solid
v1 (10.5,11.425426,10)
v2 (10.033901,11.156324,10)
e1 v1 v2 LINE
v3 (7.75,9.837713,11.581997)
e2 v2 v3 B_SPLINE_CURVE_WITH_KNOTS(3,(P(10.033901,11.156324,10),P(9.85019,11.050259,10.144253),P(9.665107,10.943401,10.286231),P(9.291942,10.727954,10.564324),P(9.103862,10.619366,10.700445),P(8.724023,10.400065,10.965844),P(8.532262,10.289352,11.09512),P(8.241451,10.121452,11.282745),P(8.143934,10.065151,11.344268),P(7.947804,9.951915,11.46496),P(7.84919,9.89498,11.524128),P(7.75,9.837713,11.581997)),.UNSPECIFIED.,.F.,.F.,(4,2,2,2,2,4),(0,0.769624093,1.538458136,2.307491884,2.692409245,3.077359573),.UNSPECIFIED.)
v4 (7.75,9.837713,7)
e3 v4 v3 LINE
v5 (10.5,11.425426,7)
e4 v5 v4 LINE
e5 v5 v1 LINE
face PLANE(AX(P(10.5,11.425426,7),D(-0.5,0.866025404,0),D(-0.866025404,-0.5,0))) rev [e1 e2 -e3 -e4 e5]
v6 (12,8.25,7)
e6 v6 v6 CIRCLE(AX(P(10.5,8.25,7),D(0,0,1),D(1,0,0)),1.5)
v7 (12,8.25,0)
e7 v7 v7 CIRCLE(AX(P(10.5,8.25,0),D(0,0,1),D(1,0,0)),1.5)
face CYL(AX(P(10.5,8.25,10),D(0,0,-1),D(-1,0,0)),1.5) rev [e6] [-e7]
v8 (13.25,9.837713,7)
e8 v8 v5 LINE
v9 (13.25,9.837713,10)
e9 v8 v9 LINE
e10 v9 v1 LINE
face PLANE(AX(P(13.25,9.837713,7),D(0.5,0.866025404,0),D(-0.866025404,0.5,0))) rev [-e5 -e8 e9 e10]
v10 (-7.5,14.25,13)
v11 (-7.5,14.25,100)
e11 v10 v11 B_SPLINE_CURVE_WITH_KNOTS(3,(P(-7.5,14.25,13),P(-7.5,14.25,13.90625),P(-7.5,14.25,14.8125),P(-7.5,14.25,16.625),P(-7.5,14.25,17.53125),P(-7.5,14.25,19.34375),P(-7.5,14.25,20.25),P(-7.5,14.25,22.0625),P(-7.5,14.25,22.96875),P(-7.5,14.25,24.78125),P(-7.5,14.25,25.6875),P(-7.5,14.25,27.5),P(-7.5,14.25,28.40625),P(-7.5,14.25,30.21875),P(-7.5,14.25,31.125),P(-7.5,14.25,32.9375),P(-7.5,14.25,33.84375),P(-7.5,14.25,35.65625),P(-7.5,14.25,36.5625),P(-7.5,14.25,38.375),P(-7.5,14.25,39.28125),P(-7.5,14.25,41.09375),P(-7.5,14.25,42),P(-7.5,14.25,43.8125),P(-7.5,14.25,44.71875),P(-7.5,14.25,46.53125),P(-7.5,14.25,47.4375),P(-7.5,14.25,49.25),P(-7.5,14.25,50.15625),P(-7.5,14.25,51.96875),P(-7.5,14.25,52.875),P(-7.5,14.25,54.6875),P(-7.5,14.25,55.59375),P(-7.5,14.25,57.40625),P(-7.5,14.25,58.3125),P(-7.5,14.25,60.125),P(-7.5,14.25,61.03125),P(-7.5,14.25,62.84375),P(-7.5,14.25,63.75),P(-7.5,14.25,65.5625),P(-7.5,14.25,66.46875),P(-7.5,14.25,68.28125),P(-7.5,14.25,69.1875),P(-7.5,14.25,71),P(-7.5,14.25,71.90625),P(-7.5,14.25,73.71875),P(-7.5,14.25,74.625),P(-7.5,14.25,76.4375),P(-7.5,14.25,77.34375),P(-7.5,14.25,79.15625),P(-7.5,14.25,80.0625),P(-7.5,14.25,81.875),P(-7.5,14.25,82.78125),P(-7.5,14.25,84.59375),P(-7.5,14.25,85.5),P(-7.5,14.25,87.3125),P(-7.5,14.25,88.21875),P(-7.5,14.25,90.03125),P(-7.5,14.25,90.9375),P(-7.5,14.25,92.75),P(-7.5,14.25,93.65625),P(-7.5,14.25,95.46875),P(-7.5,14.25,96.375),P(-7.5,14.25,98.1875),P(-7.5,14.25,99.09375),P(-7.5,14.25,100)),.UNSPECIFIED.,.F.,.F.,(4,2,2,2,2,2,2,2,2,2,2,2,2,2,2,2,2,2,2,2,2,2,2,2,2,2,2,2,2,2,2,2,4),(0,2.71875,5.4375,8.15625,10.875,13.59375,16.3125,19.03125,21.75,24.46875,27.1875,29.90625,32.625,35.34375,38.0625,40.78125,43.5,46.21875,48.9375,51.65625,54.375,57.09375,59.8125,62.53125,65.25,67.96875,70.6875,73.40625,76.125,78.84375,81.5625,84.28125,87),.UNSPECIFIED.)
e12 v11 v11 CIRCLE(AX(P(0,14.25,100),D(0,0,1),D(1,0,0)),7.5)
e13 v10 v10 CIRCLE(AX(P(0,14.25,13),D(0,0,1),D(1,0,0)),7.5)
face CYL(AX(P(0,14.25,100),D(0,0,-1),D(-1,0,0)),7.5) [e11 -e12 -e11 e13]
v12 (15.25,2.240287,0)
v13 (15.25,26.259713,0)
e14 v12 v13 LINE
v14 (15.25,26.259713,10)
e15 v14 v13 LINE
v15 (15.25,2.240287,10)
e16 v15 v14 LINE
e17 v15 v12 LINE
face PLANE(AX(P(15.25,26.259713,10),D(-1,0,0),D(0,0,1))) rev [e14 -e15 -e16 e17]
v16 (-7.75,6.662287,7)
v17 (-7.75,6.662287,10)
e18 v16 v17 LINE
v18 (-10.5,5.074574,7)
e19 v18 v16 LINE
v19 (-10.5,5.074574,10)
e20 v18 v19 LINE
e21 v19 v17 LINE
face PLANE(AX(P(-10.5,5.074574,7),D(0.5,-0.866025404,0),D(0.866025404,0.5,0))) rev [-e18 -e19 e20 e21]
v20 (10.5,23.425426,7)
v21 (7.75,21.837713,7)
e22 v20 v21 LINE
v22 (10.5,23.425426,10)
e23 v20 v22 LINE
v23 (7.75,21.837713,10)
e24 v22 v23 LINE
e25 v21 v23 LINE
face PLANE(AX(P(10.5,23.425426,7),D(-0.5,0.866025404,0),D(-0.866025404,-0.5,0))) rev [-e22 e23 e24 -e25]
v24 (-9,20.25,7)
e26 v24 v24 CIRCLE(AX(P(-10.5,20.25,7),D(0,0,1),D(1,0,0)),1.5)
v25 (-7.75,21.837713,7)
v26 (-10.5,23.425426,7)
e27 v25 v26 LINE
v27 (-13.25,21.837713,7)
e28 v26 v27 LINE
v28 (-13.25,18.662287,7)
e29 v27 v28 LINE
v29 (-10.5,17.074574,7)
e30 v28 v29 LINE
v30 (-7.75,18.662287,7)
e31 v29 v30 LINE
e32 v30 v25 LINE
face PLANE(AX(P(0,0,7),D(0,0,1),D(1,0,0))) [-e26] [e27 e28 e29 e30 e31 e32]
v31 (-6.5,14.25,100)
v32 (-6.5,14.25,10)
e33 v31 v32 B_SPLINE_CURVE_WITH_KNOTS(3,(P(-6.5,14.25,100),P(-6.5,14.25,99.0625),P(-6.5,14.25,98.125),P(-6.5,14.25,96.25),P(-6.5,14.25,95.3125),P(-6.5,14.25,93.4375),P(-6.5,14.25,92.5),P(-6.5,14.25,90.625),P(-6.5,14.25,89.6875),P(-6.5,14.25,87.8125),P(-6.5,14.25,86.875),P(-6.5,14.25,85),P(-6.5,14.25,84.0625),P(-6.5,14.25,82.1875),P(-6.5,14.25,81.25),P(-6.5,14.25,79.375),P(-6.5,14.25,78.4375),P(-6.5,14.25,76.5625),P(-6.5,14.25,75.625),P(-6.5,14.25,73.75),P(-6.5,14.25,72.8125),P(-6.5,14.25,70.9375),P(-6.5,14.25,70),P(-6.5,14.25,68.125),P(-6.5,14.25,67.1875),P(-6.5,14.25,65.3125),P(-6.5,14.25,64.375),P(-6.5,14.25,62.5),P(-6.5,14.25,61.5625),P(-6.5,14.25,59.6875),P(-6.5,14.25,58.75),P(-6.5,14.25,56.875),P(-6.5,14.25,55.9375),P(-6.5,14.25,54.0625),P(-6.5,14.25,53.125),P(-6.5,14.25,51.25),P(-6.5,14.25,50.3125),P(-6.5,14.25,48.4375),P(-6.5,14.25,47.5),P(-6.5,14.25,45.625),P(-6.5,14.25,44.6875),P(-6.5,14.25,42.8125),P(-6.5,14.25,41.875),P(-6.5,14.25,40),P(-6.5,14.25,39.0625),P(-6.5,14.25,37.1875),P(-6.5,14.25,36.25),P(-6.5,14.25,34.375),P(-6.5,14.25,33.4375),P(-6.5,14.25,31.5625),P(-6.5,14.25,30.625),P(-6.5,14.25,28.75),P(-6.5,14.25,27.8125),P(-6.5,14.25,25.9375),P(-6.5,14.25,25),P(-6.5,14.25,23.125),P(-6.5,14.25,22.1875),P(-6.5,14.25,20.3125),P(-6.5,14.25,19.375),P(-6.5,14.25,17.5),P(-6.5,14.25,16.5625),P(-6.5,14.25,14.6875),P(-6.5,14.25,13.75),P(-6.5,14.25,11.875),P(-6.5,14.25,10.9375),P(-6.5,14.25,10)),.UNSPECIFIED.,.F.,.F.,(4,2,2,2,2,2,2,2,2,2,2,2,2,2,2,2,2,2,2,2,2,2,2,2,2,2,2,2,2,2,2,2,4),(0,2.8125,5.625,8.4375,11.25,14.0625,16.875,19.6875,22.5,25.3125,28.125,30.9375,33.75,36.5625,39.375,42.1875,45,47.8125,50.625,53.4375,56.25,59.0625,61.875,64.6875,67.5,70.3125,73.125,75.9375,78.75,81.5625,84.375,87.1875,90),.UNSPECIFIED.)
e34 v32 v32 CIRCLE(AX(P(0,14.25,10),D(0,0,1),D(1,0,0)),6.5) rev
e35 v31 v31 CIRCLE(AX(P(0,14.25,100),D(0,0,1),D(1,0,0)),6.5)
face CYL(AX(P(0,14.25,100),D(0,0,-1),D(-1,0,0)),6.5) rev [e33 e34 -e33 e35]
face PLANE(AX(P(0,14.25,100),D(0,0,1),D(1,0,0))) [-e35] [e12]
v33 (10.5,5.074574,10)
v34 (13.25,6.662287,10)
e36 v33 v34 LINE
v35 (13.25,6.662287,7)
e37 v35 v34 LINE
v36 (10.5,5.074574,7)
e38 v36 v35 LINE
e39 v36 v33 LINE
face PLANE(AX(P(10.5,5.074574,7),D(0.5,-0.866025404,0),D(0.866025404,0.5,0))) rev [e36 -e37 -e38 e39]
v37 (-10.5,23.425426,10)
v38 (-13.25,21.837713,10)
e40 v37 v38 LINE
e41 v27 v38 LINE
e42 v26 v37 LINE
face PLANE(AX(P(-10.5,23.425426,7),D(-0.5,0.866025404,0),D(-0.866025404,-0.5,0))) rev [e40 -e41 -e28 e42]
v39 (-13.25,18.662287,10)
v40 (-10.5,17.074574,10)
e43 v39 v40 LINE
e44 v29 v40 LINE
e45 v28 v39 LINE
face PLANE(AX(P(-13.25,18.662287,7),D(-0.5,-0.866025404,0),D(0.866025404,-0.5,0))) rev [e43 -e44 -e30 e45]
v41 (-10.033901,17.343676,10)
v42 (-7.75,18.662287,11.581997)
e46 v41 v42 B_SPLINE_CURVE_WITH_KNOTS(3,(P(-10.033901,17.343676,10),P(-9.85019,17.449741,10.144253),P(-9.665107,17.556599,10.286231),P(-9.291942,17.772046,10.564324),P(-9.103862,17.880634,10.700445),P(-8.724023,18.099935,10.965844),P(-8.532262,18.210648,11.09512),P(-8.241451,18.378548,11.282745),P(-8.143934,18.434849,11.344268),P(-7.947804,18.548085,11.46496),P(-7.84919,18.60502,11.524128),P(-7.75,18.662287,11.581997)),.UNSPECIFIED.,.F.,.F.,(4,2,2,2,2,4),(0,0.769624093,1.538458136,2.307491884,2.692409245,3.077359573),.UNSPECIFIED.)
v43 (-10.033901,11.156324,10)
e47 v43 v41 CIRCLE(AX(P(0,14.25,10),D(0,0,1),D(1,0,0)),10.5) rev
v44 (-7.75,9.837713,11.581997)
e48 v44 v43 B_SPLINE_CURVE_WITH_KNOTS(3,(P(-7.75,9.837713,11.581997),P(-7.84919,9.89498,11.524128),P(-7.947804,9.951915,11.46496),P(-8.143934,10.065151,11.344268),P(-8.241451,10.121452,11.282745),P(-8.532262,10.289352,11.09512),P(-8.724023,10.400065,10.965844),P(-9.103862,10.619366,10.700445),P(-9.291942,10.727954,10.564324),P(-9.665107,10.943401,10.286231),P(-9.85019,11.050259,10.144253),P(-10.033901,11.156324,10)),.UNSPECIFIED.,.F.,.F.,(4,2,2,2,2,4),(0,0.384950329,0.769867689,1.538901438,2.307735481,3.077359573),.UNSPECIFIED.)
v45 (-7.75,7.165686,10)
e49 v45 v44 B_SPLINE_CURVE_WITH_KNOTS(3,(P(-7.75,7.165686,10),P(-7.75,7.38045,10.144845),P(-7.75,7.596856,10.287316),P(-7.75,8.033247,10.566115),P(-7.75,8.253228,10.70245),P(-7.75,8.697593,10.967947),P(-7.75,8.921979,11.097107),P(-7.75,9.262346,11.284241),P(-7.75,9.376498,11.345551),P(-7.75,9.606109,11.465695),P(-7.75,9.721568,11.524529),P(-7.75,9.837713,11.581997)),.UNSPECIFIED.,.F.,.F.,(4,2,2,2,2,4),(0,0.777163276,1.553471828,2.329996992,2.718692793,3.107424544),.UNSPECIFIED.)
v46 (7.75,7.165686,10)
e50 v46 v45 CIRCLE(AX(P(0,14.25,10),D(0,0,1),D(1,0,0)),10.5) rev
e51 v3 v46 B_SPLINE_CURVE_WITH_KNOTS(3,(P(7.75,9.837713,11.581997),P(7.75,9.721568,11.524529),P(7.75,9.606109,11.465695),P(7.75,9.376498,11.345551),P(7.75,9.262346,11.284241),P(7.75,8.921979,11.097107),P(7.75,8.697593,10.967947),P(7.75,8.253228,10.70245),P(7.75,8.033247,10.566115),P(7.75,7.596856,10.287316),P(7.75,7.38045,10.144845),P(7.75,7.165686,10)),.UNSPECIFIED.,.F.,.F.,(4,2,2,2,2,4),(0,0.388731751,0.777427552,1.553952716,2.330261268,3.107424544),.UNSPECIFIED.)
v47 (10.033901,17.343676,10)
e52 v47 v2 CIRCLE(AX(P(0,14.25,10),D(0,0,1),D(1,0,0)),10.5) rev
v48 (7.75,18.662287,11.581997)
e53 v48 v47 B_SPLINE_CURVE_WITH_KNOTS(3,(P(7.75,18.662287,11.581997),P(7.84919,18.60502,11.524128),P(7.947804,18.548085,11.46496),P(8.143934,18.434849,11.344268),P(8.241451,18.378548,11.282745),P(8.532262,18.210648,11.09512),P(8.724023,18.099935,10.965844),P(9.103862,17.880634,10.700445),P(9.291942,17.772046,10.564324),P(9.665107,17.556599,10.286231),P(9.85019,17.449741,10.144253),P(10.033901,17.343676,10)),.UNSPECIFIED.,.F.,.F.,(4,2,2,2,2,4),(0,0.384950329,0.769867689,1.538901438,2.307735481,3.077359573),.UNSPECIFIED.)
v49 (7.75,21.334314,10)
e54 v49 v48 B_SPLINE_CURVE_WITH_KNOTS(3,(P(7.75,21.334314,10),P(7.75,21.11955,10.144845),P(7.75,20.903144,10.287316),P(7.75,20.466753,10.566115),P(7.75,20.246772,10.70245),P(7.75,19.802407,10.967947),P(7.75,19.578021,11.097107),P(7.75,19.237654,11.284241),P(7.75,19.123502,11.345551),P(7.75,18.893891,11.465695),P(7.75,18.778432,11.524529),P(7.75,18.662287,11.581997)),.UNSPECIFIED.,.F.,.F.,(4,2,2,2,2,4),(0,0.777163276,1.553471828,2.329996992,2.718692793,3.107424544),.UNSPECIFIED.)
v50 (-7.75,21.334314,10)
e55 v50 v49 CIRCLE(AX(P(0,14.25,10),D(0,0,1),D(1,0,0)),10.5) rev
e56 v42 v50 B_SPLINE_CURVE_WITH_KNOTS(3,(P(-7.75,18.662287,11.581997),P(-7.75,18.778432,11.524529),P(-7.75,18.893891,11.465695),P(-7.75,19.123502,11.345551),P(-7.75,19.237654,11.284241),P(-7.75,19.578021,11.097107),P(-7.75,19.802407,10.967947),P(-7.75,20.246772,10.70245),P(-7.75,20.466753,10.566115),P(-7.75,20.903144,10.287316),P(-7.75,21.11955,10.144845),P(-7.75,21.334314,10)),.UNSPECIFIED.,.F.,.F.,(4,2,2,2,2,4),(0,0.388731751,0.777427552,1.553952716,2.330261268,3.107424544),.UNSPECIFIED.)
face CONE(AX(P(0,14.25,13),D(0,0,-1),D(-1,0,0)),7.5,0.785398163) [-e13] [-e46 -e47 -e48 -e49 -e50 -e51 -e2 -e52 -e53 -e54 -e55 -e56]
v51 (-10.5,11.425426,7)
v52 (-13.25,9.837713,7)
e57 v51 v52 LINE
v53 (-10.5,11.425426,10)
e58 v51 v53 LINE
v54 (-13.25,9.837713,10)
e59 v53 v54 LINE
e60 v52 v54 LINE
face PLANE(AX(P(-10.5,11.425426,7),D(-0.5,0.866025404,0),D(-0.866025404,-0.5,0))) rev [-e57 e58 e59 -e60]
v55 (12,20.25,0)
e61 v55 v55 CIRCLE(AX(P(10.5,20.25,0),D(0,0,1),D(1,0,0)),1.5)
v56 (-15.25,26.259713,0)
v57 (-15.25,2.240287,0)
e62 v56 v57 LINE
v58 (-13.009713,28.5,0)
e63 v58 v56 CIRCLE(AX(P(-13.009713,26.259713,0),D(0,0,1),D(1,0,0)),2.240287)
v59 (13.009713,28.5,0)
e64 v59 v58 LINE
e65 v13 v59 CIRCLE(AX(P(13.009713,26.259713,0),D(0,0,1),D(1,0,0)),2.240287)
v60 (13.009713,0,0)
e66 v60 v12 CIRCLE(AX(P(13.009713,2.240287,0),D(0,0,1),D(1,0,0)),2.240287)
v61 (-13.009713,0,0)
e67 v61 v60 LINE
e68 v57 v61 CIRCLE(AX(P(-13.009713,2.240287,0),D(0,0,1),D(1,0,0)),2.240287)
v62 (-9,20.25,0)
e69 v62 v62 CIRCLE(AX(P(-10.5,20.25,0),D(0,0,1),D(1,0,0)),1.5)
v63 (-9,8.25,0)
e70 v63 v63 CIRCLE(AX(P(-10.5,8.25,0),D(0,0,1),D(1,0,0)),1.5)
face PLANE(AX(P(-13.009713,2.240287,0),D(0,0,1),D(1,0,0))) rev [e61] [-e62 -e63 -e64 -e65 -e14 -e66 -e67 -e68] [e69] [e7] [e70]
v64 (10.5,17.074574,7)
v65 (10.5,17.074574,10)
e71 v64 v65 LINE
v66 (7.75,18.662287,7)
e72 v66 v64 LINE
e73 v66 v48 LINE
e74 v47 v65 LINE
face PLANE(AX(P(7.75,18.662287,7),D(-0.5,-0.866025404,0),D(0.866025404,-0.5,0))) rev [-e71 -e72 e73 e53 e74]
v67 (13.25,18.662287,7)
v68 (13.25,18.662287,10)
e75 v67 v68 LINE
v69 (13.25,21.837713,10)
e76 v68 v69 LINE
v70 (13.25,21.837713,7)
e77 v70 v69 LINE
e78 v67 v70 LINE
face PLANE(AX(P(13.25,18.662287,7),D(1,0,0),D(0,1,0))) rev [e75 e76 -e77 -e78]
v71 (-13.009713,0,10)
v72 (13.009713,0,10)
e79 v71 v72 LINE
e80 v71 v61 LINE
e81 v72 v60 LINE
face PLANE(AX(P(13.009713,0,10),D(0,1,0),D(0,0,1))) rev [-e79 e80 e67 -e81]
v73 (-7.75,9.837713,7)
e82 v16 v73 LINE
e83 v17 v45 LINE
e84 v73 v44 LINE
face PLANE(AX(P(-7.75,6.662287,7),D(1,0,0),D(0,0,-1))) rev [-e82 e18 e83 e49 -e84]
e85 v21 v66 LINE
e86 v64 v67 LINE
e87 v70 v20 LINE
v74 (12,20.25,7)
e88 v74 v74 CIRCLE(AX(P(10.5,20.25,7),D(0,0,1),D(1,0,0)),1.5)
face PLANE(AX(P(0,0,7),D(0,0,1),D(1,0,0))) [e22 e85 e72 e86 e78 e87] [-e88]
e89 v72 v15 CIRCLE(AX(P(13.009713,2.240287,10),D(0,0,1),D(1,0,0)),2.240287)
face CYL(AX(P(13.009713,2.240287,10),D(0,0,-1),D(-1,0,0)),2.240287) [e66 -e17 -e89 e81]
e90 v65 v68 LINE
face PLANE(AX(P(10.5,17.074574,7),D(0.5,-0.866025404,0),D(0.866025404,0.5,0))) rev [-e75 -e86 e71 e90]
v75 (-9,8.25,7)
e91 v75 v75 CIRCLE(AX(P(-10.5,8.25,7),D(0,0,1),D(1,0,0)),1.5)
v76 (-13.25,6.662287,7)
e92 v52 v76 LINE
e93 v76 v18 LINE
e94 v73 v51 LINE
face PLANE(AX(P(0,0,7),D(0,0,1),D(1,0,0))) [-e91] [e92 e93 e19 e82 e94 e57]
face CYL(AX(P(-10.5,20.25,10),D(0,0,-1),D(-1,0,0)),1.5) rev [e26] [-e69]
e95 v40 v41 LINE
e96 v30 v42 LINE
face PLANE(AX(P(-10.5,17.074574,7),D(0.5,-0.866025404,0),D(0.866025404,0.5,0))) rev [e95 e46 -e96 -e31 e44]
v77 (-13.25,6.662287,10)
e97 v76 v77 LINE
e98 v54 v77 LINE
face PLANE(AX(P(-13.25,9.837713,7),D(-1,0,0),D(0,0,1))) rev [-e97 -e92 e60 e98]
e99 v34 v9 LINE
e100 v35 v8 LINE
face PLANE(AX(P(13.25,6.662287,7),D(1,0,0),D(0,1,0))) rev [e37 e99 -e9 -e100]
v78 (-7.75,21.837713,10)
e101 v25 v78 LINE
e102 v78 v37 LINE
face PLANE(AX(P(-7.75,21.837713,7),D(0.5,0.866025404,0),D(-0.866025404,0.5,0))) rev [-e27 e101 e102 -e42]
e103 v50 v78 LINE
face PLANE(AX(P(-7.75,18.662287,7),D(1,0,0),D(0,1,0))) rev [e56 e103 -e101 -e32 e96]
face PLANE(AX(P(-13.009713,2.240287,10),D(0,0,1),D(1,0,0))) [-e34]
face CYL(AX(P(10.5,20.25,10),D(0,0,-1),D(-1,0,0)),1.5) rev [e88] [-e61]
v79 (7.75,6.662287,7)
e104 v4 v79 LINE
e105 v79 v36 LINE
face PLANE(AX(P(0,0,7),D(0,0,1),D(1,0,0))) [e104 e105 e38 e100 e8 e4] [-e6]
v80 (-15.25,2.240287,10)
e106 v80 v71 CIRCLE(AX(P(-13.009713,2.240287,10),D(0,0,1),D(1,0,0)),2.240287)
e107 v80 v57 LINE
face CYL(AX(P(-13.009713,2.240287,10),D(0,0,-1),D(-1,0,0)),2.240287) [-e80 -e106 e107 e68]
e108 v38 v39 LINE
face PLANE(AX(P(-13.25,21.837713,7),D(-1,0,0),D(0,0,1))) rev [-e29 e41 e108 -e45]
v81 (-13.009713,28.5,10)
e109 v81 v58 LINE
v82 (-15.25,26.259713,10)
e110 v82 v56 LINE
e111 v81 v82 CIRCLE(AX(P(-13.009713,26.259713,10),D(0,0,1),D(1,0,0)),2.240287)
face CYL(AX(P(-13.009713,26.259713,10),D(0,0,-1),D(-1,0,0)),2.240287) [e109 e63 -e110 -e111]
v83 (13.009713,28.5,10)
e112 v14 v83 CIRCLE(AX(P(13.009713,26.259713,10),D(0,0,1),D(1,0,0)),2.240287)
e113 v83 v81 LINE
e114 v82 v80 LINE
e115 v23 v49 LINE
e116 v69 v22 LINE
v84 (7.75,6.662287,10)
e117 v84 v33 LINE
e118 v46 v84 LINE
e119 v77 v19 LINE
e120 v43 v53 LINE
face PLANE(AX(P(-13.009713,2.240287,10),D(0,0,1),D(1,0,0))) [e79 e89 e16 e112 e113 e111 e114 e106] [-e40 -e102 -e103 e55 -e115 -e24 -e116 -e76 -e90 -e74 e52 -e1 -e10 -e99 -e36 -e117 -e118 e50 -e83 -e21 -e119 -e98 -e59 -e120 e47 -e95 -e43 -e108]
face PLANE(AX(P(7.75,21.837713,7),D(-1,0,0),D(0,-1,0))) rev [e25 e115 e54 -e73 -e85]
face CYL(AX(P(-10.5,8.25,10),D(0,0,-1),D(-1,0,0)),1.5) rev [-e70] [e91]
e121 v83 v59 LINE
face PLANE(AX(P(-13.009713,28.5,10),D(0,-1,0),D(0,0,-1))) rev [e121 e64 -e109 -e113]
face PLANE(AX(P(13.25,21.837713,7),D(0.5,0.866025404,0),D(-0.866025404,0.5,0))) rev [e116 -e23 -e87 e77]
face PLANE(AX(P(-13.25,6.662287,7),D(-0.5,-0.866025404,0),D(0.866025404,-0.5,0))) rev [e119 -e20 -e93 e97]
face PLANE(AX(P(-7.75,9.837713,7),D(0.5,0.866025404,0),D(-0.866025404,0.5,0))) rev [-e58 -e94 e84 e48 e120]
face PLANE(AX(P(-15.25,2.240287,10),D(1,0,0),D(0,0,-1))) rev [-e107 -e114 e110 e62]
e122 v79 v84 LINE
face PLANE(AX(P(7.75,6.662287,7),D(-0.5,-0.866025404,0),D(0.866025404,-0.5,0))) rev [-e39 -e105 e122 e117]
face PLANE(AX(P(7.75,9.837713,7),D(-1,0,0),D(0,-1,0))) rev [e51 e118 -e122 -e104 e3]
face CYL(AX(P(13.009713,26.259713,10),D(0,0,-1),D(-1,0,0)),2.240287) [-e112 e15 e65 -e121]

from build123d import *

# Parameters (mm, degrees)
SKETCH1_R           = 1.5
BOSS_EXTRUDE1_DEPTH = 10
CUT_EXTRUDE2_DEPTH  = 3
SKETCH3_R           = 7.5
SKETCH3_R_2         = 6.5
BOSS_EXTRUDE2_DEPTH = 90
CHAMFER1_SIZE       = 3


with BuildPart() as part:
    # Sketch1 → Boss-Extrude1 (new body)
    with BuildSketch(Plane.XY):
        with BuildLine():
            Line((-13.009713205, 28.5), (13.009713205, 28.5))
            ThreePointArc((13.009713205, 28.5), (14.59383519, 27.84383519), (15.25, 26.259713205))
            Line((15.25, 26.259713205), (15.25, 2.240286795))
            ThreePointArc((15.25, 2.240286795), (14.59383519, 0.65616481), (13.009713205, 0))
            Line((13.009713205, 0), (-13.009713205, 0))
            ThreePointArc((-13.009713205, 0), (-14.59383519, 0.65616481), (-15.25, 2.240286795))
            Line((-15.25, 2.240286795), (-15.25, 26.259713205))
            ThreePointArc((-15.25, 26.259713205), (-14.59383519, 27.84383519), (-13.009713205, 28.5))
        make_face()
        with Locations((-10.5, 20.25)):
            Circle(SKETCH1_R, mode=Mode.SUBTRACT)
        with Locations((10.5, 20.25)):
            Circle(SKETCH1_R, mode=Mode.SUBTRACT)
        with Locations((10.5, 8.25)):
            Circle(SKETCH1_R, mode=Mode.SUBTRACT)
        with Locations((-10.5, 8.25)):
            Circle(SKETCH1_R, mode=Mode.SUBTRACT)
    extrude(amount=BOSS_EXTRUDE1_DEPTH)

    # Sketch2 → Cut-Extrude2 (cut)
    with BuildSketch(Plane.XY.offset(10)):
        Polygon((-10.5, 23.425426481), (-13.25, 21.83771324), (-13.25, 18.66228676), (-10.5, 17.074573519), (-7.75, 18.66228676), (-7.75, 21.83771324), align=None)
        Polygon((-10.5, 11.425426481), (-13.25, 9.83771324), (-13.25, 6.66228676), (-10.5, 5.074573519), (-7.75, 6.66228676), (-7.75, 9.83771324), align=None)
        Polygon((10.5, 23.425426481), (7.75, 21.83771324), (7.75, 18.66228676), (10.5, 17.074573519), (13.25, 18.66228676), (13.25, 21.83771324), align=None)
        Polygon((10.5, 11.425426481), (7.75, 9.83771324), (7.75, 6.66228676), (10.5, 5.074573519), (13.25, 6.66228676), (13.25, 9.83771324), align=None)
    extrude(amount=-CUT_EXTRUDE2_DEPTH, mode=Mode.SUBTRACT)

    # Sketch3 → Boss-Extrude2 (add)
    with BuildSketch(Plane.XY.offset(10)):
        with Locations(Location((0, 14.25, 0), (0, 0, 180))):
            Circle(SKETCH3_R)
        with Locations(Location((0, 14.25, 0), (0, 0, 180))):
            Circle(SKETCH3_R_2, mode=Mode.SUBTRACT)
    extrude(amount=BOSS_EXTRUDE2_DEPTH)

    # Chamfer1
    # the kernel refuses this chamfer: 3 mm, written as the material it adds along each edge
    with BuildSketch(Plane(origin=(0, 14.25, 10), x_dir=(-1, 0, 0), z_dir=(0, 1, 0))) as chamfer1_piece_1_section:
        Polygon((7.5 + CHAMFER1_SIZE, 0), (7.5, CHAMFER1_SIZE), (7.5, 0), align=None)
    chamfer1_piece_1 = revolve(axis=Axis((0, 14.25, 10), (0, 0, 1)), mode=Mode.PRIVATE)
    chamfer1_piece_1 = split(chamfer1_piece_1, bisect_by=Plane(origin=(7.75, 14.25, 10.835375001), z_dir=(-1, 0, 0)), keep=Keep.TOP, mode=Mode.PRIVATE)
    chamfer1_piece_1 = split(chamfer1_piece_1, bisect_by=Plane(origin=(-10.27932295, 11.298018527, 10.835375001), z_dir=(0.4999999999999999, 0.8660254037844388, 0)), keep=Keep.TOP, mode=Mode.PRIVATE)
    chamfer1_piece_1 = split(chamfer1_piece_1, bisect_by=Plane(origin=(-10.27932295, 17.201981474, 10.835375001), z_dir=(0.5000000000000004, -0.8660254037844384, 0)), keep=Keep.TOP, mode=Mode.PRIVATE)
    add(chamfer1_piece_1)
    with BuildSketch(Plane(origin=(0, 14.25, 10), x_dir=(-1, 0, 0), z_dir=(0, 1, 0))) as chamfer1_piece_2_section:
        Polygon((7.5 + CHAMFER1_SIZE, 0), (7.5, CHAMFER1_SIZE), (7.5, 0), align=None)
    chamfer1_piece_2 = revolve(axis=Axis((0, 14.25, 10), (0, 0, 1)), mode=Mode.PRIVATE)
    chamfer1_piece_2 = split(chamfer1_piece_2, bisect_by=Plane(origin=(7.75, 21.633797899, 10.850650839), z_dir=(-1, 0, 0)), keep=Keep.TOP, mode=Mode.PRIVATE)
    chamfer1_piece_2 = split(chamfer1_piece_2, bisect_by=Plane(origin=(-7.75, 21.633797899, 10.850650839), z_dir=(1, 0, 0)), keep=Keep.TOP, mode=Mode.PRIVATE)
    add(chamfer1_piece_2)
    with BuildSketch(Plane(origin=(0, 14.25, 10), x_dir=(-1, 0, 0), z_dir=(0, 1, 0))) as chamfer1_piece_3_section:
        Polygon((7.5 + CHAMFER1_SIZE, 0), (7.5, CHAMFER1_SIZE), (7.5, 0), align=None)
    chamfer1_piece_3 = revolve(axis=Axis((0, 14.25, 10), (0, 0, 1)), mode=Mode.PRIVATE)
    chamfer1_piece_3 = split(chamfer1_piece_3, bisect_by=Plane(origin=(10.279322953, 11.298018528, 10.835374999), z_dir=(-0.5000000000000011, 0.866025403784438, 0)), keep=Keep.TOP, mode=Mode.PRIVATE)
    chamfer1_piece_3 = split(chamfer1_piece_3, bisect_by=Plane(origin=(-7.75, 14.25, 10.835374999), z_dir=(1, 0, 0)), keep=Keep.TOP, mode=Mode.PRIVATE)
    chamfer1_piece_3 = split(chamfer1_piece_3, bisect_by=Plane(origin=(10.279322953, 17.201981472, 10.835374999), z_dir=(-0.49999999999999445, -0.8660254037844419, 0)), keep=Keep.TOP, mode=Mode.PRIVATE)
    add(chamfer1_piece_3)


solid = part.part
